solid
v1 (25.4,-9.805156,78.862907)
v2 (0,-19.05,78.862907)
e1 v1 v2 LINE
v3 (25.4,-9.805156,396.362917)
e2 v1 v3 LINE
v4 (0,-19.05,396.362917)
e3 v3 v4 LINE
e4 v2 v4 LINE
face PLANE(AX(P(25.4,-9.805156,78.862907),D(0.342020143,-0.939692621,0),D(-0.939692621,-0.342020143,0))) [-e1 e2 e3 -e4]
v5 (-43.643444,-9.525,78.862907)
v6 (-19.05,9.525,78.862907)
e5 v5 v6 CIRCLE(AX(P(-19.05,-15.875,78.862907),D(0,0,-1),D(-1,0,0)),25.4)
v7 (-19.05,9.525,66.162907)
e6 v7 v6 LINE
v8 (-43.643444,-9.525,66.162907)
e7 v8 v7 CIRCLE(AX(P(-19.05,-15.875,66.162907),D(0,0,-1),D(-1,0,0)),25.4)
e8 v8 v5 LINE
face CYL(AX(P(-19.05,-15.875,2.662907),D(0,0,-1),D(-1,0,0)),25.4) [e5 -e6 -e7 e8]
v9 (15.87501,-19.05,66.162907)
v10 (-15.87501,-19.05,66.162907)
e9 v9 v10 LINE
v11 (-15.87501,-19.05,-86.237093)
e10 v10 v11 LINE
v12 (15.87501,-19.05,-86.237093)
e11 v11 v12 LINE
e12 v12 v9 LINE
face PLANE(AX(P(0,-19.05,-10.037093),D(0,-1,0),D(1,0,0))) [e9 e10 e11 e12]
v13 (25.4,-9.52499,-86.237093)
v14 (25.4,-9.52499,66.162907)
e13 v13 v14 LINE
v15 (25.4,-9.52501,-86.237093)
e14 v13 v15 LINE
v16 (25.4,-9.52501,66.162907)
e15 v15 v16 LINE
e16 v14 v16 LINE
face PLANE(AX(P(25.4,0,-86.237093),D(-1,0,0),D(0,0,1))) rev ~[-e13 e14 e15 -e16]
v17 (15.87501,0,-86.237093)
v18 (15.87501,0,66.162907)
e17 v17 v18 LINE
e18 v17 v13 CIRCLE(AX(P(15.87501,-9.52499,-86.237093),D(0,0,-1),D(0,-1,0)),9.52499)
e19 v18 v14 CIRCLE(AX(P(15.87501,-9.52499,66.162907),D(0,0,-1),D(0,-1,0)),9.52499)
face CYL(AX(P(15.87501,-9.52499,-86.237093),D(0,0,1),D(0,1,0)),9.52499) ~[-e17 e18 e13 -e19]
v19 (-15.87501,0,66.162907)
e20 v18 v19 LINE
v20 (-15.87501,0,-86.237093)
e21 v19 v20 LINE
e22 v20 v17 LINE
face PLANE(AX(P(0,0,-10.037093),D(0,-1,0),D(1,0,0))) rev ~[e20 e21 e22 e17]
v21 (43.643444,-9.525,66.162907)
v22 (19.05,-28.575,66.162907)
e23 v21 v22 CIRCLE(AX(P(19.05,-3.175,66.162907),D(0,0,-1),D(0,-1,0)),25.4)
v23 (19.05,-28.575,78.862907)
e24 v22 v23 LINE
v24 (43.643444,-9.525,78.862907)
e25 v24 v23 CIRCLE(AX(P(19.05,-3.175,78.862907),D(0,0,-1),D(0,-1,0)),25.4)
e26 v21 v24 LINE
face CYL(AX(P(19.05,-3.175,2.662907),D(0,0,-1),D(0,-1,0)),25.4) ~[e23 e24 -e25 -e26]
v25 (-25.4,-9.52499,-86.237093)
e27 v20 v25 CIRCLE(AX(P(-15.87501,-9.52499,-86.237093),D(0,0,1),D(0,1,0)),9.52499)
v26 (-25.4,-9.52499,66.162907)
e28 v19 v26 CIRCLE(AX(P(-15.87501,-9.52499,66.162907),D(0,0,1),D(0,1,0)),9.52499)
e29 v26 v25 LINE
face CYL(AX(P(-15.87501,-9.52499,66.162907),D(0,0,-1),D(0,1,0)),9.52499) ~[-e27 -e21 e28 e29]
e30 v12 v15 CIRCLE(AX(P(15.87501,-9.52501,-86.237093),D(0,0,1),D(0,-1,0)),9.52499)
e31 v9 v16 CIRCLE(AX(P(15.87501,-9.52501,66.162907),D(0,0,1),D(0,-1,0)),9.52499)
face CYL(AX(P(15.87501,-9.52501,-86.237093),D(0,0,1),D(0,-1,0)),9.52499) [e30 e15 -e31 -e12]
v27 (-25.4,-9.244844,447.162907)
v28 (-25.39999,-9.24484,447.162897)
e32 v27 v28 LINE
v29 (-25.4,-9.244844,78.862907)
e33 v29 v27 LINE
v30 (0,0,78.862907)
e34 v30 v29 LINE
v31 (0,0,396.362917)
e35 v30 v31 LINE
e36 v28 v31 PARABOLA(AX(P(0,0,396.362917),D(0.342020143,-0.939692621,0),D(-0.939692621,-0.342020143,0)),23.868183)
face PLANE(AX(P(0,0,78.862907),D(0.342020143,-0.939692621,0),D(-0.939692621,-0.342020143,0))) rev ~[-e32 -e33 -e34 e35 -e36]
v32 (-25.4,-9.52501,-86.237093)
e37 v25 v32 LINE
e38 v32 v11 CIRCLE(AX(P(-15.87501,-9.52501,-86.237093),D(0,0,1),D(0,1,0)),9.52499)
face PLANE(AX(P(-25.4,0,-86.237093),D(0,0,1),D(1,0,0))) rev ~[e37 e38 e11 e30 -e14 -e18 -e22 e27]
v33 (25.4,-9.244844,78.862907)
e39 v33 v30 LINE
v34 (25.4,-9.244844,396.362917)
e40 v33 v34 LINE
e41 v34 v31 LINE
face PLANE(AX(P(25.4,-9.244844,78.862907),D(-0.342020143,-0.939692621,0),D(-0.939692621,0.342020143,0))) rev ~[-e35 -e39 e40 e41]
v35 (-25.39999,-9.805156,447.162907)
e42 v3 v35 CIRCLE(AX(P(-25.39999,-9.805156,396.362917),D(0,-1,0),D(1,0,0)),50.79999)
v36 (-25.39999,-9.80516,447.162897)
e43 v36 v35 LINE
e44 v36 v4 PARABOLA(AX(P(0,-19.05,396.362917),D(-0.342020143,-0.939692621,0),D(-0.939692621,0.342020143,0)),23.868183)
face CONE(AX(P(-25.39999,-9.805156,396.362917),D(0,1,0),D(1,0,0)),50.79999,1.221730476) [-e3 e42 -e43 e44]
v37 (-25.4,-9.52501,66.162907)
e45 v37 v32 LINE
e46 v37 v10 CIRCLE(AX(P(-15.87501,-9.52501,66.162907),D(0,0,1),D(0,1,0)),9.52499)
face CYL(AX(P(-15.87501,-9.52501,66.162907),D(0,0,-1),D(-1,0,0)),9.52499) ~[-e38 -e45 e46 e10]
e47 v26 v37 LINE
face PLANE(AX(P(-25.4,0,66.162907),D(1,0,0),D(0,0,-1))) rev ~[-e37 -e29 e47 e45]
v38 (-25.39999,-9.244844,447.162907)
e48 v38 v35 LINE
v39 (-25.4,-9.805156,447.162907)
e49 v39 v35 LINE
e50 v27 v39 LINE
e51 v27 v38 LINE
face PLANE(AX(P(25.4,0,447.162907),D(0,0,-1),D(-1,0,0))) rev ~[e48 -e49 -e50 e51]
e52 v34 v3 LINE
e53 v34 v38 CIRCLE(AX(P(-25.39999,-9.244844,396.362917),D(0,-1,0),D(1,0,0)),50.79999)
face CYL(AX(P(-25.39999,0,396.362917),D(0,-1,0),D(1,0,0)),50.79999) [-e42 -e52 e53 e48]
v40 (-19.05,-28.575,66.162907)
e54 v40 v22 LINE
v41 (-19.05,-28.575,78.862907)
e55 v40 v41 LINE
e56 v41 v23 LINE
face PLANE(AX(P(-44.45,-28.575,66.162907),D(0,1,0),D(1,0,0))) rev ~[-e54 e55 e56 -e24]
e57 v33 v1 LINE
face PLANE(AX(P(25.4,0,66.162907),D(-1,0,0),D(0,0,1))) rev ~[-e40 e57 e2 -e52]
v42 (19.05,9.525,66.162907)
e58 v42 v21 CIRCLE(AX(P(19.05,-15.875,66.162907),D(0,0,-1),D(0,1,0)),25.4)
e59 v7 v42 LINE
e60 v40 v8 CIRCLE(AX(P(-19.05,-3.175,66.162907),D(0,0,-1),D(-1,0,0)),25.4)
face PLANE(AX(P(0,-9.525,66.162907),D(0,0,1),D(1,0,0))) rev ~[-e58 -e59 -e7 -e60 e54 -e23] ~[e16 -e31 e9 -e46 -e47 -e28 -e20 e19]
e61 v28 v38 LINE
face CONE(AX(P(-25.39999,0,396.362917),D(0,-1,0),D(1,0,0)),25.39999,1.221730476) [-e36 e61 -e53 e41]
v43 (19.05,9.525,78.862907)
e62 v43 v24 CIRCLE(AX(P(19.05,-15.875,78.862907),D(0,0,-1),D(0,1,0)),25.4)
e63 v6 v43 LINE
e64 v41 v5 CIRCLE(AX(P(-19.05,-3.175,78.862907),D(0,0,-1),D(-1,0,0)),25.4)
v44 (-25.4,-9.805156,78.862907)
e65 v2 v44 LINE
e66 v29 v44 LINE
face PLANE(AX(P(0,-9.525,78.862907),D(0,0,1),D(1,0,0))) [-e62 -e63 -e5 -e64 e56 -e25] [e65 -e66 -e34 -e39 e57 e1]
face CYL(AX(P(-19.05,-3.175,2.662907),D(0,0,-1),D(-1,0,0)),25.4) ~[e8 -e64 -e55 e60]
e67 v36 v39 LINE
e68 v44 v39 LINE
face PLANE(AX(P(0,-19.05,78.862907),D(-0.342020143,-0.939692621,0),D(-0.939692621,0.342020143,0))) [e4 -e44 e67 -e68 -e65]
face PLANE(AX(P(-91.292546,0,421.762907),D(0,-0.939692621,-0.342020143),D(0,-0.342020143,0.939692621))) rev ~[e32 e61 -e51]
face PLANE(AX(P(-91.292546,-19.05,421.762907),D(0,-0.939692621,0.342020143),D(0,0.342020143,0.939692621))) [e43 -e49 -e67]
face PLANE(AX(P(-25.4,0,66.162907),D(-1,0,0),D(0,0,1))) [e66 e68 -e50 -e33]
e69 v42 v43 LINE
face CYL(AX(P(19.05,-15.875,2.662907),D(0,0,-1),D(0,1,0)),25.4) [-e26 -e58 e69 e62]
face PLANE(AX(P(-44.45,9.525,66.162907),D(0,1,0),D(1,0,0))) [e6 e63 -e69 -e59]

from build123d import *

# Parameters (mm, degrees)
F1_DEPTH     = 19.05
F2_W         = 88.9
F2_H         = 38.1
F3_DEPTH     = 12.7
F4_W         = 50.8
F4_H         = 381
F5_DEPTH     = 19.05
F6_R         = 50.79999
F7_T1_DEPTH  = 434.1925462068
F7_T3_DEPTH  = 317.50001
F7_T5_DEPTH  = 65.8925562068
F7_T8_ANGLE  = 90
F7_T10_ANGLE = 90
F8_R         = 9.52499
F9_T1_DEPTH  = 139.7


# Not quite as in the source:
# - a fillet or chamfer that OpenCascade refuses, or shapes differently, is made with other operations: its cross-section is extruded or revolved along the edge and cut away or added
# - a fillet or chamfer is up to 0.001 mm smaller than in the source, because OpenCascade refuses the exact size


with BuildPart() as f1:
    # F0 (on Front) → F1 (new body)
    with BuildSketch(Plane.XZ):
        Polygon((-25.4, -86.237093463), (0, -86.237093463), (25.4, -86.237093463), (25.4, 66.162906537), (-25.4, 66.162906537), align=None)
    extrude(amount=F1_DEPTH)

    # F2 (on face) → F3 (join)
    with BuildSketch(Plane.XY.offset(66.162906537)):
        with Locations((0, -9.525)):
            Rectangle(F2_W, F2_H)
    extrude(amount=F3_DEPTH)

    # F4 (on face) → F5 (join)
    with BuildSketch(Plane(origin=(0, 0, 0), x_dir=(-1, 0, 0), z_dir=(0, 1, 0))):
        with Locations((0, 256.662906537)):
            Rectangle(F4_W, F4_H)
    extrude(amount=-F5_DEPTH)

    # F6 (radius 50.8 in the source; OpenCascade refuses exactly that, so slightly less here)
    f6_edges = [f1.edges().sort_by_distance(p)[0] for p in [
        (25.4, -9.525, 447.162907),
    ]]
    fillet(f6_edges, radius=F6_R)

    # F7: chamfer of 25.4 x 9.2448439504 on 6 edges, made by hand

    # F7_s2 → F7_t1 (cut)
    with BuildSketch(Plane.XY.offset(78.862906537)):
        Polygon((0, 0), (-25.4, -9.2448439504), (-25.4, 0), align=None)
        Polygon((0, -19.05), (-25.4, -9.8051560496), (-25.4, -19.05), align=None)
    extrude(amount=F7_T1_DEPTH, mode=Mode.SUBTRACT)

    # F7_s4 → F7_t3 (cut)
    with BuildSketch(Plane.XY.offset(78.862906537)):
        Polygon((25.4, -9.2448439504), (0, 0), (25.4, 0), align=None)
        Polygon((25.4, -9.8051560496), (0, -19.05), (25.4, -19.05), align=None)
    extrude(amount=F7_T3_DEPTH, mode=Mode.SUBTRACT)

    # F7_s6 → F7_t5 (cut)
    with BuildSketch(Plane.YZ.offset(-91.2925462068)):
        Polygon((-19.05, 421.762906537), (-9.8051560496, 447.162906537), (-19.05, 447.162906537), align=None)
        Polygon((0, 421.762906537), (-9.2448439504, 447.162906537), (0, 447.162906537), align=None)
    extrude(amount=F7_T5_DEPTH, mode=Mode.SUBTRACT)

    # F7_s7 → F7_t8 (revolve, cut)
    with BuildSketch(Plane.XY.offset(396.362916537)):
        Polygon((0, 0), (25.4, -9.2448439504), (25.4, 0), align=None)
    revolve(axis=Axis((-25.39999, 0, 396.362916537), (0, -1, 0)), revolution_arc=F7_T8_ANGLE, mode=Mode.SUBTRACT)

    # F7_s9 → F7_t10 (revolve, cut)
    with BuildSketch(Plane.XY.offset(396.362916537)):
        Polygon((25.4, -9.8051560496), (0, -19.05), (25.4, -19.05), align=None)
    revolve(axis=Axis((-25.39999, -19.05, 396.362916537), (0, -1, 0)), revolution_arc=F7_T10_ANGLE, mode=Mode.SUBTRACT)

    # F8 (radius 9.525 in the source; OpenCascade refuses exactly that, so slightly less here)
    f8_edges = [f1.edges().sort_by_distance(p)[0] for p in [
        (25.4, 0, -10.037093),
        (-25.4, 0, -10.037093),
        (-25.4, -19.05, -10.037093),
        (25.4, -19.05, -10.037093),
    ]]
    fillet(f8_edges, radius=F8_R)

    # F9: fillet of radius 25.4 on 4 edges, made by hand

    # F9_s2 → F9_t1 (cut)
    with BuildSketch(Plane.XY.offset(2.662906537)):
        with BuildLine():
            ThreePointArc((19.05, -28.575), (37.0105122421, -21.1355122421), (44.45, -3.175))
            Line((44.45, -3.175), (44.45, -28.575))
            Line((44.45, -28.575), (19.05, -28.575))
        make_face()
        with BuildLine():
            ThreePointArc((19.05, 9.525), (37.0105122421, 2.0855122421), (44.45, -15.875))
            Line((44.45, -15.875), (44.45, 9.525))
            Line((44.45, 9.525), (19.05, 9.525))
        make_face()
        with BuildLine():
            ThreePointArc((-44.45, -3.175), (-37.0105122421, -21.1355122421), (-19.05, -28.575))
            Line((-19.05, -28.575), (-44.45, -28.575))
            Line((-44.45, -28.575), (-44.45, -3.175))
        make_face()
        with BuildLine():
            ThreePointArc((-44.45, -15.875), (-37.0105122421, 2.0855122421), (-19.05, 9.525))
            Line((-19.05, 9.525), (-44.45, 9.525))
            Line((-44.45, 9.525), (-44.45, -15.875))
        make_face()
    extrude(amount=F9_T1_DEPTH, mode=Mode.SUBTRACT)


solid = f1.part
